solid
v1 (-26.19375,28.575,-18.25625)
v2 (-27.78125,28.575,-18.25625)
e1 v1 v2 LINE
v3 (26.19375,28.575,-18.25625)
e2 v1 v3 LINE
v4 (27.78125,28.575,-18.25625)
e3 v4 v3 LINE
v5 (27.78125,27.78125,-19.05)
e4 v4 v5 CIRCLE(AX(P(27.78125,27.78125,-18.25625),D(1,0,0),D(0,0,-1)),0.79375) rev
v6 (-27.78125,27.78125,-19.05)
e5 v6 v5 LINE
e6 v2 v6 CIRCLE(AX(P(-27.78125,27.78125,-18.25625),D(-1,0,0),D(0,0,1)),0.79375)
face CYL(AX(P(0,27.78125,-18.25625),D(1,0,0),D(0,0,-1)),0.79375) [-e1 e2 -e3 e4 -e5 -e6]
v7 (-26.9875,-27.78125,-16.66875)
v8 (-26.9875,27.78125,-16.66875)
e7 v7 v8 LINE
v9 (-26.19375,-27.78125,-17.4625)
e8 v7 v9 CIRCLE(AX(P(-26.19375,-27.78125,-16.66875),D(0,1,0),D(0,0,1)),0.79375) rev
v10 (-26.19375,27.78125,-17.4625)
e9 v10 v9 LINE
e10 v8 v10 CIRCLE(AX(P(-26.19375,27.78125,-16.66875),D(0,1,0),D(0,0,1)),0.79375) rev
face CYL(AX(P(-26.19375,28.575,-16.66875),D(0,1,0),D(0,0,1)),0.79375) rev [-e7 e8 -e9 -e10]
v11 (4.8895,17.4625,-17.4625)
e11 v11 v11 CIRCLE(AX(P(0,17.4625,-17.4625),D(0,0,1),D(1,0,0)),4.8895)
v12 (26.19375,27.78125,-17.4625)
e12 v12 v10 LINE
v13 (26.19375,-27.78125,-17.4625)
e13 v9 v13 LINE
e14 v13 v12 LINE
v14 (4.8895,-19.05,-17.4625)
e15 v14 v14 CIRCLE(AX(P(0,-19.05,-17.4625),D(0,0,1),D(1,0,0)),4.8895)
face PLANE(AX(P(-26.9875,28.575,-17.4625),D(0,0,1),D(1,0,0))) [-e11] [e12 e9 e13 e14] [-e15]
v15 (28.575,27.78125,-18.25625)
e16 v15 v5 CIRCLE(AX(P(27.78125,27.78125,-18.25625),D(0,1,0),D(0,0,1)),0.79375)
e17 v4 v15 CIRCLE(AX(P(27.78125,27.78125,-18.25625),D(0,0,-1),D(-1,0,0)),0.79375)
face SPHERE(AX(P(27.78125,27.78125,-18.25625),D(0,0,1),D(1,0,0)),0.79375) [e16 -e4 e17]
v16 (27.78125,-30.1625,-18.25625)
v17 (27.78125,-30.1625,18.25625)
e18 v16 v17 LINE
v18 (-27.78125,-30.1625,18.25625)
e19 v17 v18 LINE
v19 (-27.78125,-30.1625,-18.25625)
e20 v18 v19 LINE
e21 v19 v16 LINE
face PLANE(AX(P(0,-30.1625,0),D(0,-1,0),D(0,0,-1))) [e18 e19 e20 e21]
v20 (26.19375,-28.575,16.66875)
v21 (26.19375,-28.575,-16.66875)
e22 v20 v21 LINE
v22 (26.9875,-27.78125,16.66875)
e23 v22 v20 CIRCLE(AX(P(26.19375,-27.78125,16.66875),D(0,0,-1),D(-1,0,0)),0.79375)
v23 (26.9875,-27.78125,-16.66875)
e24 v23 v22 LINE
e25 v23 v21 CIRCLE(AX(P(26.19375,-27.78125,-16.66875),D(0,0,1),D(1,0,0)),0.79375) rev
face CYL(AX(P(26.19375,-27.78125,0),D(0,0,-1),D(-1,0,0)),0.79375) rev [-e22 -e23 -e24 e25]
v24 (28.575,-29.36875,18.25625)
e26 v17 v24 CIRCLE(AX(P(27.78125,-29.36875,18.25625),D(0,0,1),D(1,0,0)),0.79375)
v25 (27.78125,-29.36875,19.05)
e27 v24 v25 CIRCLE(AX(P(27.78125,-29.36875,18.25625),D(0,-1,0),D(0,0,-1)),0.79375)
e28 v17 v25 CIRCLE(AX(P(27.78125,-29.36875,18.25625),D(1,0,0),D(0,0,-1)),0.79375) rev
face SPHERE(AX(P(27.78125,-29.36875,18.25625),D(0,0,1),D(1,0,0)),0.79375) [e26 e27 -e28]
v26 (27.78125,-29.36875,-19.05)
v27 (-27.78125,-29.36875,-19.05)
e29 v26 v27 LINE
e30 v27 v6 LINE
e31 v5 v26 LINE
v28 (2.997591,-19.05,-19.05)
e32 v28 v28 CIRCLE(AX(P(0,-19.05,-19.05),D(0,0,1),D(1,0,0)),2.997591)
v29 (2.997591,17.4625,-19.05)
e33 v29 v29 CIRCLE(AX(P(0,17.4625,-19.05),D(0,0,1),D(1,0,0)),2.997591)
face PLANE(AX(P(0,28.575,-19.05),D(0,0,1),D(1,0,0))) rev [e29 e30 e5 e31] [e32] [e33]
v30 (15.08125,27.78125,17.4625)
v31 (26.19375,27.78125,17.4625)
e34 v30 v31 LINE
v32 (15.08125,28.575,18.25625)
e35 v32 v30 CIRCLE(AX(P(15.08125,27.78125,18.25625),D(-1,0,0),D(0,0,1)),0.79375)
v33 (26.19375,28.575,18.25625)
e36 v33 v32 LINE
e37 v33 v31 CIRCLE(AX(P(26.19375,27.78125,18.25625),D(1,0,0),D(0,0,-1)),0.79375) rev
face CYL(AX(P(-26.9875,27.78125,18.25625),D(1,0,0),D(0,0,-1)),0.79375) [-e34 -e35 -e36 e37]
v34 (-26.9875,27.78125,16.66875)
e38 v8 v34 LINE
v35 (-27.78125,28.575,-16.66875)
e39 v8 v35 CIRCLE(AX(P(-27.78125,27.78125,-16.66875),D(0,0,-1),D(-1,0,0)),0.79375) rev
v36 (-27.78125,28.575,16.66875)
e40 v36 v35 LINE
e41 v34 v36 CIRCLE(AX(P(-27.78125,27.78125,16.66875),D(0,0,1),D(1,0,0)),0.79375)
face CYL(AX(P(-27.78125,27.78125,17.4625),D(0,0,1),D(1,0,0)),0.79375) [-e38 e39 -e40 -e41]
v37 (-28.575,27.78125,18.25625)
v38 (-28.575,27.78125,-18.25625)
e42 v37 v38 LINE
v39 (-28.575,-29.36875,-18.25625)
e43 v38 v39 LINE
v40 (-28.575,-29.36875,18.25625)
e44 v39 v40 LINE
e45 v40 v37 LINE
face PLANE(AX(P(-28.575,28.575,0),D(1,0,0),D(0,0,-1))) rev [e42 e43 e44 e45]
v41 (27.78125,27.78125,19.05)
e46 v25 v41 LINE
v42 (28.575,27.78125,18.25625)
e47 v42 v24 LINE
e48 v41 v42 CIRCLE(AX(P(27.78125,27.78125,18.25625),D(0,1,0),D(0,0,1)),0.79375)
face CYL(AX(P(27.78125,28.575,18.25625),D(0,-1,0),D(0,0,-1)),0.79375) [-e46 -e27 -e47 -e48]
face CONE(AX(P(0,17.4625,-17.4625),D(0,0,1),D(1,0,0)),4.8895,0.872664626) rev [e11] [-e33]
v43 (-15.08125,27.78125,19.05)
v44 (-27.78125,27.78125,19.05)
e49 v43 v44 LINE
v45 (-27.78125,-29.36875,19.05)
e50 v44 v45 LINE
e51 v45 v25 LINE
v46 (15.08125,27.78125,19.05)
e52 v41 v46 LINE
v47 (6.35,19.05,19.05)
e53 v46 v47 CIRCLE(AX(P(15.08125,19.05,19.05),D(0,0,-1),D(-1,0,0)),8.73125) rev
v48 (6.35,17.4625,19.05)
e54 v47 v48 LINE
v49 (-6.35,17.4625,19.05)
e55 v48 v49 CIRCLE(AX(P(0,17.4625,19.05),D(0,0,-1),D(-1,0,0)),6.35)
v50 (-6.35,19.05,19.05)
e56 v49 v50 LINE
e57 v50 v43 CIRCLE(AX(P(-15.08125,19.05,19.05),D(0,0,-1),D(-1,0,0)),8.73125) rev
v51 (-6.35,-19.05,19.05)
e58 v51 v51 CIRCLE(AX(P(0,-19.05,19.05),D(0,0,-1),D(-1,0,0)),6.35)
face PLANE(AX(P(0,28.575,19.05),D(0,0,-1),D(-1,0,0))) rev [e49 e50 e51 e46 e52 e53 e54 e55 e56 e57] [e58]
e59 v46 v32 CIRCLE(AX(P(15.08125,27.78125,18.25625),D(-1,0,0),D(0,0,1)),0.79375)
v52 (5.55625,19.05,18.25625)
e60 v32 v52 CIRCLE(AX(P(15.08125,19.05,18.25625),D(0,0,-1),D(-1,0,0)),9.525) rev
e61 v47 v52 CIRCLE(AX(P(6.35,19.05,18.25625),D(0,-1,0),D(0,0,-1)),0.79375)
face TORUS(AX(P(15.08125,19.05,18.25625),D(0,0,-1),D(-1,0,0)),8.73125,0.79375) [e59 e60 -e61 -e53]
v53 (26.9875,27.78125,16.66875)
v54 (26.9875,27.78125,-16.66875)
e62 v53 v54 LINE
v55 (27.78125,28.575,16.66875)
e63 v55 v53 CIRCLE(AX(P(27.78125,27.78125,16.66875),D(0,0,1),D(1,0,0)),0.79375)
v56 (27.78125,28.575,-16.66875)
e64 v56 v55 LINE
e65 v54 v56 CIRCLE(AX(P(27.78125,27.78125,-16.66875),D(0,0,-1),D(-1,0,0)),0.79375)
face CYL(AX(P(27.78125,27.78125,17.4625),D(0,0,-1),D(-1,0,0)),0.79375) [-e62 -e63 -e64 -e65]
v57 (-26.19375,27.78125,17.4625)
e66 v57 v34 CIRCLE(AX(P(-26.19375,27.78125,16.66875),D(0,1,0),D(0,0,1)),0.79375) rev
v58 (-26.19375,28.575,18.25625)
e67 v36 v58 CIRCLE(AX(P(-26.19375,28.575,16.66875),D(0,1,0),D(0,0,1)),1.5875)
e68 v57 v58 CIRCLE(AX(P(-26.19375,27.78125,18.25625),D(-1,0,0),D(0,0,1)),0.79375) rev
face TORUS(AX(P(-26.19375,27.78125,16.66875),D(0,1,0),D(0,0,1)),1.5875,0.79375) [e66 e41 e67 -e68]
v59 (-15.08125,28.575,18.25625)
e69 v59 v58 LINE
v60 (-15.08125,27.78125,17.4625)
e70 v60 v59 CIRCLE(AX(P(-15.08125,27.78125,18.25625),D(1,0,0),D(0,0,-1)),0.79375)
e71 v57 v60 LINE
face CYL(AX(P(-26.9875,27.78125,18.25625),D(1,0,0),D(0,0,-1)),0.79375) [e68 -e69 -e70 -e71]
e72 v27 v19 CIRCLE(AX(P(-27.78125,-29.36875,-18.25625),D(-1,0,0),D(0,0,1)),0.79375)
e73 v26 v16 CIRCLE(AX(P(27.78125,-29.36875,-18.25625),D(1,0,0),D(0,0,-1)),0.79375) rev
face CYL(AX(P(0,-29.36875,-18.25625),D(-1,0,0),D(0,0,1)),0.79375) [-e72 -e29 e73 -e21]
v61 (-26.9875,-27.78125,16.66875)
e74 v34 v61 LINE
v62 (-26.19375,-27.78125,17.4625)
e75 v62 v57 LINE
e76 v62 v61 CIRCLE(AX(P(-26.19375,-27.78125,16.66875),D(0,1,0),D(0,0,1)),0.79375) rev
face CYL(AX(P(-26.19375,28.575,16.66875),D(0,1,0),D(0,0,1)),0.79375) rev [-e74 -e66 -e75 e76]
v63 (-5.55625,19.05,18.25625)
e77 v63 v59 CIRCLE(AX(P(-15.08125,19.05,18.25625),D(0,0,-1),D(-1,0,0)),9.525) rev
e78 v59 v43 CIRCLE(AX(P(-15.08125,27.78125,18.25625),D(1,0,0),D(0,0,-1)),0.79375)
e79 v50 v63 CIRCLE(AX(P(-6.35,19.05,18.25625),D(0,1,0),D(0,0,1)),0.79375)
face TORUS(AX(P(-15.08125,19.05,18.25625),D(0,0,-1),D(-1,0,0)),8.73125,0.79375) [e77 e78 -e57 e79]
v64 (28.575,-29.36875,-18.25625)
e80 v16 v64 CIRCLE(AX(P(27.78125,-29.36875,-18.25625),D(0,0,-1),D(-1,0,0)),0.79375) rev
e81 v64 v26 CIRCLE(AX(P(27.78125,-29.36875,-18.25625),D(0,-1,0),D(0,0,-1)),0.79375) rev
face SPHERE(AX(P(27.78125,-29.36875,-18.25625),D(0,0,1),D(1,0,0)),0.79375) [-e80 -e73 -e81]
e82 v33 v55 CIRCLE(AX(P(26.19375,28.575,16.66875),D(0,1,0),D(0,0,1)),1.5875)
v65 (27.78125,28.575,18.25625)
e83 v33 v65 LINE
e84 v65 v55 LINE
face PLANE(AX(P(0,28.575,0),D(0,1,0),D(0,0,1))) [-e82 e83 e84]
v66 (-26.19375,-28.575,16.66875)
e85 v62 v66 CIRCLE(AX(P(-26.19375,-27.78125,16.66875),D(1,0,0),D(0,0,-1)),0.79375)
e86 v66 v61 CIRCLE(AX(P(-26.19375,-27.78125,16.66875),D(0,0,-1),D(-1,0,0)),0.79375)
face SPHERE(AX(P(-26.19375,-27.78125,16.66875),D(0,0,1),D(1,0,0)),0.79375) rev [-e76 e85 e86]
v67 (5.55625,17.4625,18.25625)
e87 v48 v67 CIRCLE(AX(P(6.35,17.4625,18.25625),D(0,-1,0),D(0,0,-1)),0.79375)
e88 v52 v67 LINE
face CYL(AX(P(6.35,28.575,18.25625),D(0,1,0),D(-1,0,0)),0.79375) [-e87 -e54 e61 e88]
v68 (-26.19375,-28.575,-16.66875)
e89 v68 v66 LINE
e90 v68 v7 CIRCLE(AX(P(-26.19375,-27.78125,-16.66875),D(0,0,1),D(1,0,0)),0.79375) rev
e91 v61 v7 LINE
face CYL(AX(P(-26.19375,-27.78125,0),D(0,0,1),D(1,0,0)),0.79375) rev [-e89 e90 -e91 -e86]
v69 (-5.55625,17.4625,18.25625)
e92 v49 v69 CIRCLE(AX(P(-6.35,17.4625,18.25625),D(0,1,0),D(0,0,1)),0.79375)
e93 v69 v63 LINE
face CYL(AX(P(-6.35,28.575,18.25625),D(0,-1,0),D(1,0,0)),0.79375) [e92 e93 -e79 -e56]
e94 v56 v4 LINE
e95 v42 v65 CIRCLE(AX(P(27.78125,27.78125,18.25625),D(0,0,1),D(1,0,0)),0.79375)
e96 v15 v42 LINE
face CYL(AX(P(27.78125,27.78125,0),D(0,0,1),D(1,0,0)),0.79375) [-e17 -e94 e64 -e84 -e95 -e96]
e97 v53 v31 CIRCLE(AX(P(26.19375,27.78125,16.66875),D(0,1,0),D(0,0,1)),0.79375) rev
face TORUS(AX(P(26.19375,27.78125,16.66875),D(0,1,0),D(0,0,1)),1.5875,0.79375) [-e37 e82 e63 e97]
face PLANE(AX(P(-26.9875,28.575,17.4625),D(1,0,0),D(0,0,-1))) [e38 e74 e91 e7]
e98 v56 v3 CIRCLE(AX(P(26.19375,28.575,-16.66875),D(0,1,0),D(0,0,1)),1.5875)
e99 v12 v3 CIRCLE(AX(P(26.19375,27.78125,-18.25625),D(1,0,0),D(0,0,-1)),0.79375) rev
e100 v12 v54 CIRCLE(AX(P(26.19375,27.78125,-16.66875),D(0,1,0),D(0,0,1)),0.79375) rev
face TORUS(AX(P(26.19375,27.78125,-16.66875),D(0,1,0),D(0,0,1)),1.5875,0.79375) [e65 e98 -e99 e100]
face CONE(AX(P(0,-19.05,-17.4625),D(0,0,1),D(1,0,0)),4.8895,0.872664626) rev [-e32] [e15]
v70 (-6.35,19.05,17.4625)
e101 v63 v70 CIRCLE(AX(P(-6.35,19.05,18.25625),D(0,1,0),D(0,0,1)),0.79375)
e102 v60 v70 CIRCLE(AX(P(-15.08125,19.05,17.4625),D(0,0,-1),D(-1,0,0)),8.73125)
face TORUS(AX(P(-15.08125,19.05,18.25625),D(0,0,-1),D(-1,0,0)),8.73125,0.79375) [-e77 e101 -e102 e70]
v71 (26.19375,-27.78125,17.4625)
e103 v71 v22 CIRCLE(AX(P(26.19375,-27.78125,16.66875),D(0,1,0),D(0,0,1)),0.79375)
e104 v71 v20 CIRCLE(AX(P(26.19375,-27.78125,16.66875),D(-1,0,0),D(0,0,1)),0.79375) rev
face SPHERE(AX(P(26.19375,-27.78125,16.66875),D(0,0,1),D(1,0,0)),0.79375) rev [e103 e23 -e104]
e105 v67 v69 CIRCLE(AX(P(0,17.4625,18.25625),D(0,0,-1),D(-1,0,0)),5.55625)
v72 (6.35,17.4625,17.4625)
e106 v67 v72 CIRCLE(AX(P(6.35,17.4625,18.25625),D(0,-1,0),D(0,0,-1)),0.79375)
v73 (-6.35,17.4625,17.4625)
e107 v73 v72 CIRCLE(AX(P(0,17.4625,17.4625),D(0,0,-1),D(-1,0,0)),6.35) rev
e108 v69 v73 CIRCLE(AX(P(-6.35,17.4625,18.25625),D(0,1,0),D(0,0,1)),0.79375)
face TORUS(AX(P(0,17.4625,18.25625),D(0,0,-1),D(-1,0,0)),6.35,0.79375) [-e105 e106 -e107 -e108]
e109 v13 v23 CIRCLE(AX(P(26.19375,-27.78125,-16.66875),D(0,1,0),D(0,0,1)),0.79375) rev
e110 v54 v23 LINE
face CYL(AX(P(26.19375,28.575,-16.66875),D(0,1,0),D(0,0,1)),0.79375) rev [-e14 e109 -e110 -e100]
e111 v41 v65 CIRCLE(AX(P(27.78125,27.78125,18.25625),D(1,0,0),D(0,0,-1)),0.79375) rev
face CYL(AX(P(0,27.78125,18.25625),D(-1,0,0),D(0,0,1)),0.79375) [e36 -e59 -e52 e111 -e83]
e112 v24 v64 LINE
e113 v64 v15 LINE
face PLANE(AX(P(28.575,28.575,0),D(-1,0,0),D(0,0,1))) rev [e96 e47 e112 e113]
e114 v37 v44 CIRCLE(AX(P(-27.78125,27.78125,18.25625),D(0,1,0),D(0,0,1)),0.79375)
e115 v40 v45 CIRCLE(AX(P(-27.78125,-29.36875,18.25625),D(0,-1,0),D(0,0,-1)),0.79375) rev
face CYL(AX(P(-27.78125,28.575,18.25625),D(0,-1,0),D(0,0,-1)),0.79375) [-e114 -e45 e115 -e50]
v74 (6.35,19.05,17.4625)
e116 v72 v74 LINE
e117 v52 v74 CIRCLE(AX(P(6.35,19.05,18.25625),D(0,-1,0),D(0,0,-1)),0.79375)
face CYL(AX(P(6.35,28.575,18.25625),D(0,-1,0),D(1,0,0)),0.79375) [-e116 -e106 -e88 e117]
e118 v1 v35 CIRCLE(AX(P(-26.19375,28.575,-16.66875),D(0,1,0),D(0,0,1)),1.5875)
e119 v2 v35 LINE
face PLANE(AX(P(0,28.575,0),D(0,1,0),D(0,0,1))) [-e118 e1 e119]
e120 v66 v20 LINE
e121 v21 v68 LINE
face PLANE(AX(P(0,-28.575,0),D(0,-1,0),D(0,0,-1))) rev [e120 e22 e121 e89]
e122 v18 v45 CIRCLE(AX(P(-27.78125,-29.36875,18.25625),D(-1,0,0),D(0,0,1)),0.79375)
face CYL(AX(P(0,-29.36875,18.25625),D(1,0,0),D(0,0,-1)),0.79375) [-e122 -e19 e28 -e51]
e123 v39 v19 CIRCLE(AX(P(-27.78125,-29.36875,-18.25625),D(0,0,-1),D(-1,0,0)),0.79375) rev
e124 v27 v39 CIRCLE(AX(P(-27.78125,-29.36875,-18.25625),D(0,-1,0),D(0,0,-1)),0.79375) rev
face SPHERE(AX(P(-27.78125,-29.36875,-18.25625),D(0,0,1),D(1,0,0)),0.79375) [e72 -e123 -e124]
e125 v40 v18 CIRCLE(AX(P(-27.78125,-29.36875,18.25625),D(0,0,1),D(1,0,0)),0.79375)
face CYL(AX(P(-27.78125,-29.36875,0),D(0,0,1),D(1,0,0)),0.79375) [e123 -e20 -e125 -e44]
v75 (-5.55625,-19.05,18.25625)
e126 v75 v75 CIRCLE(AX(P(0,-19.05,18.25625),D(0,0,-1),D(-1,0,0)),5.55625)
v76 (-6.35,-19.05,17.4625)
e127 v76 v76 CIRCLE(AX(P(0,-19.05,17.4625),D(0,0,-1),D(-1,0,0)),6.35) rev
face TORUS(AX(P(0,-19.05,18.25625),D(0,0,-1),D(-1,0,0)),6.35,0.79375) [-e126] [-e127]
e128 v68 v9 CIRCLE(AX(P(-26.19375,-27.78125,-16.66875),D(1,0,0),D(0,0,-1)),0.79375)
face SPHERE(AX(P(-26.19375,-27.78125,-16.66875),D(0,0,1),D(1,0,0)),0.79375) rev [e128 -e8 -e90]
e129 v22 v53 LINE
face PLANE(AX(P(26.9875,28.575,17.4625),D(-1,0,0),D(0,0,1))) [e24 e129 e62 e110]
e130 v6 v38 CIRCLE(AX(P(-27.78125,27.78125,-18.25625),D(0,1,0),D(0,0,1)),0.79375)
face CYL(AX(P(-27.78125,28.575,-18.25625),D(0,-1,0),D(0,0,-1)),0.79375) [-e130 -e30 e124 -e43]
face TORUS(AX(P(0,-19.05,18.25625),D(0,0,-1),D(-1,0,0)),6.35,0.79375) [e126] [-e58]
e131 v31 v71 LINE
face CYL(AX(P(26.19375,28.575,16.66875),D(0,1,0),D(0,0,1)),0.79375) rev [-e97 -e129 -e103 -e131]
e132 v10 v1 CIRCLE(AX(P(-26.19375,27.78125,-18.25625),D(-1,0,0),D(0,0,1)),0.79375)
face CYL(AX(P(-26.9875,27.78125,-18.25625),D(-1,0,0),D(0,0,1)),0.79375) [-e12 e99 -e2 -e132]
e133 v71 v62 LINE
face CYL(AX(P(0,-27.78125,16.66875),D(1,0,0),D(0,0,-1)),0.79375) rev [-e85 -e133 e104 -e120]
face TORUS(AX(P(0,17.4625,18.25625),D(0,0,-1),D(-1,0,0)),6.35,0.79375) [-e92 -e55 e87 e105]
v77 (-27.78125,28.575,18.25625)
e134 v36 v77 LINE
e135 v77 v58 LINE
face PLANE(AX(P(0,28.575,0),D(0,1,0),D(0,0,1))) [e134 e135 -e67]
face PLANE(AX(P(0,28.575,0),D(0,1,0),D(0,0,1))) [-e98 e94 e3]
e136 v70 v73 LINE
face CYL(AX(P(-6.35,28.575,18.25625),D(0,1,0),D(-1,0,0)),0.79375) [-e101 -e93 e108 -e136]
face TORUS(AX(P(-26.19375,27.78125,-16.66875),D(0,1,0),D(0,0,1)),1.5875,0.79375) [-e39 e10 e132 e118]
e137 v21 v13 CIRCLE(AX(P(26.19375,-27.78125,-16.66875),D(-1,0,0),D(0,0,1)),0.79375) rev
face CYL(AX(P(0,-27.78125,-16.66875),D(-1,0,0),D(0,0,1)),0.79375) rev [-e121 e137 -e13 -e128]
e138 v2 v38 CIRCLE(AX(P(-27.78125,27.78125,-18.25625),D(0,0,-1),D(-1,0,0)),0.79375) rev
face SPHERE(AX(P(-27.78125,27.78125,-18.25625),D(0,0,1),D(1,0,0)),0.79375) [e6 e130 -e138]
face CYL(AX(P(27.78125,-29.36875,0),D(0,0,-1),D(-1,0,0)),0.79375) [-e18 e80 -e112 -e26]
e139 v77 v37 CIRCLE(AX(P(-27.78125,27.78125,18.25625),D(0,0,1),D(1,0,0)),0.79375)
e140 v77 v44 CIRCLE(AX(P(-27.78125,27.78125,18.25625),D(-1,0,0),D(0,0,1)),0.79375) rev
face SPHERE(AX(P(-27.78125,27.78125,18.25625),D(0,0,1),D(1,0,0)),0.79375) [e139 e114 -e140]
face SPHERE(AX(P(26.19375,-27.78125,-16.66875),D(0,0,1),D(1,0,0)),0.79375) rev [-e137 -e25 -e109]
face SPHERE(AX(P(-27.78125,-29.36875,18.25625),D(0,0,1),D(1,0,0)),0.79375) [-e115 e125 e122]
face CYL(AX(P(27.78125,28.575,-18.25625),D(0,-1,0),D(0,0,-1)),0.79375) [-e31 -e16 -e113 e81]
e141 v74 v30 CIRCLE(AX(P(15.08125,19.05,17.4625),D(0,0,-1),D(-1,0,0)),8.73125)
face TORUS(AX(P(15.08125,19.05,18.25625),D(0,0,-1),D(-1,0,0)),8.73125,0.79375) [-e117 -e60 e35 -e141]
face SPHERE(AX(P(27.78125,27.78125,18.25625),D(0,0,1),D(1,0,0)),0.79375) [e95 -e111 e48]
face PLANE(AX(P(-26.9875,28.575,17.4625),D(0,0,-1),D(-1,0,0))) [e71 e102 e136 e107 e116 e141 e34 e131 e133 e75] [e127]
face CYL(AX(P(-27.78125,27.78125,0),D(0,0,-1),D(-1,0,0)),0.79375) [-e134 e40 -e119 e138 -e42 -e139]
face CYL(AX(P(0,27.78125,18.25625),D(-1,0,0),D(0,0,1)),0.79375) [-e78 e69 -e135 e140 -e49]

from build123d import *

# Parameters (mm, degrees)
SKETCH1_W                                  = 57.15
SKETCH1_H                                  = 38.1
SKETCH1_W_2                                = 53.975
SKETCH1_H_2                                = 34.925
EXTRUDE_THIN1_DEPTH                        = 28.575
SKETCH2_W                                  = 57.15
SKETCH2_H                                  = 38.1
BOSS_EXTRUDE1_DEPTH                        = 1.5875
CUT_EXTRUDE1_REACH                         = 58.373
SKETCH3_R                                  = 5.55625
CSK_FOR_10_FLAT_HEAD_MACHINE_SCREW_2_COUNT = 2
CSK_FOR_10_FLAT_HEAD_MACHINE_SCREW_2_PITCH = 36.5125
FILLET1_R                                  = 9.525
FILLET4_R                                  = 0.79375


with BuildPart() as part:
    # Sketch1 → Extrude-Thin1 (new, symmetric)
    with BuildSketch(Plane(origin=(0, 0, 0), x_dir=(1, 0, 0), z_dir=(0, 1, 0))):
        Rectangle(SKETCH1_W, SKETCH1_H)
        Rectangle(SKETCH1_W_2, SKETCH1_H_2, mode=Mode.SUBTRACT)
    extrude(amount=EXTRUDE_THIN1_DEPTH, both=True)

    # Sketch2 → Boss-Extrude1 (add)
    with BuildSketch(Plane.XZ.offset(28.575)):
        Rectangle(SKETCH2_W, SKETCH2_H)
    extrude(amount=BOSS_EXTRUDE1_DEPTH)

    # Sketch3 → Cut-Extrude1 (cut, up to next)
    with BuildSketch(Plane.XY.offset(19.05), mode=Mode.PRIVATE) as cut_extrude1_sk1:
        with Locations((0, -19.05)):
            Circle(SKETCH3_R)
    cut_extrude1_tool1 = extrude(cut_extrude1_sk1.sketch, amount=-CUT_EXTRUDE1_REACH, mode=Mode.PRIVATE) & part.part
    # Sketch3 → Cut-Extrude1 (cut, up to next)
    with BuildSketch(Plane.XY.offset(19.05), mode=Mode.PRIVATE) as cut_extrude1_sk2:
        with BuildLine():
            Line((5.55625, 28.575), (5.55625, 17.4625))
            ThreePointArc((5.55625, 17.4625), (0, 11.90625), (-5.55625, 17.4625))
            Line((-5.55625, 17.4625), (-5.55625, 28.575))
            ThreePointArc((-5.55625, 28.575), (0, 34.13125), (5.55625, 28.575))
        make_face()
    cut_extrude1_tool2 = extrude(cut_extrude1_sk2.sketch, amount=-CUT_EXTRUDE1_REACH, mode=Mode.PRIVATE) & part.part
    add(cut_extrude1_tool1.solids().sort_by_distance((0, -19.05, 19.05))[0], mode=Mode.SUBTRACT)
    add(cut_extrude1_tool2.solids().sort_by_distance((0, 23.01875, 19.05))[0], mode=Mode.SUBTRACT)

    # Sketch5 → CSK for #10 Flat Head Machine Screw (100)1 (revolve, cut)
    with BuildSketch(Plane(origin=(0, 17.4625, -17.4625), x_dir=(0, -1, 0), z_dir=(1, 0, 0))):
        Polygon((0, 0), (0, 1.5875), (2.5527, 1.5875), (2.5527, 1.960808018), (4.8895, 0), align=None)
    csk_for_10_flat_head_machine_screw_100 = revolve(axis=Axis((0, 17.4625, -11.1125), (0, 0, -1)), mode=Mode.SUBTRACT)

    # CSK for _10 Flat Head Machine Screw  2: CSK for #10 Flat Head Machine Screw (100)1 ×2
    with Locations(*[(0, -i * CSK_FOR_10_FLAT_HEAD_MACHINE_SCREW_2_PITCH, 0) for i in range(1, CSK_FOR_10_FLAT_HEAD_MACHINE_SCREW_2_COUNT)]):
        add(csk_for_10_flat_head_machine_screw_100, mode=Mode.SUBTRACT)

    # Fillet1
    fillet1_edges = [part.edges().sort_by_distance(p)[0] for p in [
        (-5.55625, 28.575, 18.25625),
        (5.55625, 28.575, 18.25625),
    ]]
    fillet(fillet1_edges, radius=FILLET1_R)

    # Fillet4
    fillet4_edges = [part.edges().sort_by_distance(p)[0] for p in [
        (-8.346057909, 25.785192091, 19.05),
        (-5.55625, 18.25625, 19.05),
        (0, 11.90625, 19.05),
        (5.55625, 18.25625, 19.05),
        (8.346057909, 25.785192091, 19.05),
        (0, -30.1625, 19.05),
        (0, -30.1625, -19.05),
        (-28.575, -0.79375, 19.05),
        (-28.575, -30.1625, 0),
        (-28.575, -0.79375, -19.05),
        (28.575, -0.79375, -19.05),
        (28.575, -30.1625, 0),
        (28.575, -0.79375, 19.05),
        (0, 11.90625, 17.4625),
        (-5.55625, 18.25625, 17.4625),
        (-8.346057909, 25.785192091, 17.4625),
        (-26.9875, 0, 17.4625),
        (26.9875, 0, 17.4625),
        (8.346057909, 25.785192091, 17.4625),
        (5.55625, 18.25625, 17.4625),
        (26.9875, 28.575, 0),
        (0, 28.575, -17.4625),
        (-26.9875, 28.575, 0),
        (-21.034375, 28.575, 17.4625),
        (-21.828125, 28.575, 19.05),
        (-28.575, 28.575, 0),
        (0, 28.575, -19.05),
        (28.575, 28.575, 0),
        (21.828125, 28.575, 19.05),
        (21.034375, 28.575, 17.4625),
        (-5.55625, -19.05, 19.05),
        (-5.55625, -19.05, 17.4625),
        (-26.9875, -28.575, 0),
        (0, -28.575, -17.4625),
        (26.9875, -28.575, 0),
        (0, -28.575, 17.4625),
        (26.9875, 0, -17.4625),
        (-26.9875, 0, -17.4625),
    ]]
    fillet(fillet4_edges, radius=FILLET4_R - 0.0001)  # a hair under: the kernel refuses the full size


solid = part.part
